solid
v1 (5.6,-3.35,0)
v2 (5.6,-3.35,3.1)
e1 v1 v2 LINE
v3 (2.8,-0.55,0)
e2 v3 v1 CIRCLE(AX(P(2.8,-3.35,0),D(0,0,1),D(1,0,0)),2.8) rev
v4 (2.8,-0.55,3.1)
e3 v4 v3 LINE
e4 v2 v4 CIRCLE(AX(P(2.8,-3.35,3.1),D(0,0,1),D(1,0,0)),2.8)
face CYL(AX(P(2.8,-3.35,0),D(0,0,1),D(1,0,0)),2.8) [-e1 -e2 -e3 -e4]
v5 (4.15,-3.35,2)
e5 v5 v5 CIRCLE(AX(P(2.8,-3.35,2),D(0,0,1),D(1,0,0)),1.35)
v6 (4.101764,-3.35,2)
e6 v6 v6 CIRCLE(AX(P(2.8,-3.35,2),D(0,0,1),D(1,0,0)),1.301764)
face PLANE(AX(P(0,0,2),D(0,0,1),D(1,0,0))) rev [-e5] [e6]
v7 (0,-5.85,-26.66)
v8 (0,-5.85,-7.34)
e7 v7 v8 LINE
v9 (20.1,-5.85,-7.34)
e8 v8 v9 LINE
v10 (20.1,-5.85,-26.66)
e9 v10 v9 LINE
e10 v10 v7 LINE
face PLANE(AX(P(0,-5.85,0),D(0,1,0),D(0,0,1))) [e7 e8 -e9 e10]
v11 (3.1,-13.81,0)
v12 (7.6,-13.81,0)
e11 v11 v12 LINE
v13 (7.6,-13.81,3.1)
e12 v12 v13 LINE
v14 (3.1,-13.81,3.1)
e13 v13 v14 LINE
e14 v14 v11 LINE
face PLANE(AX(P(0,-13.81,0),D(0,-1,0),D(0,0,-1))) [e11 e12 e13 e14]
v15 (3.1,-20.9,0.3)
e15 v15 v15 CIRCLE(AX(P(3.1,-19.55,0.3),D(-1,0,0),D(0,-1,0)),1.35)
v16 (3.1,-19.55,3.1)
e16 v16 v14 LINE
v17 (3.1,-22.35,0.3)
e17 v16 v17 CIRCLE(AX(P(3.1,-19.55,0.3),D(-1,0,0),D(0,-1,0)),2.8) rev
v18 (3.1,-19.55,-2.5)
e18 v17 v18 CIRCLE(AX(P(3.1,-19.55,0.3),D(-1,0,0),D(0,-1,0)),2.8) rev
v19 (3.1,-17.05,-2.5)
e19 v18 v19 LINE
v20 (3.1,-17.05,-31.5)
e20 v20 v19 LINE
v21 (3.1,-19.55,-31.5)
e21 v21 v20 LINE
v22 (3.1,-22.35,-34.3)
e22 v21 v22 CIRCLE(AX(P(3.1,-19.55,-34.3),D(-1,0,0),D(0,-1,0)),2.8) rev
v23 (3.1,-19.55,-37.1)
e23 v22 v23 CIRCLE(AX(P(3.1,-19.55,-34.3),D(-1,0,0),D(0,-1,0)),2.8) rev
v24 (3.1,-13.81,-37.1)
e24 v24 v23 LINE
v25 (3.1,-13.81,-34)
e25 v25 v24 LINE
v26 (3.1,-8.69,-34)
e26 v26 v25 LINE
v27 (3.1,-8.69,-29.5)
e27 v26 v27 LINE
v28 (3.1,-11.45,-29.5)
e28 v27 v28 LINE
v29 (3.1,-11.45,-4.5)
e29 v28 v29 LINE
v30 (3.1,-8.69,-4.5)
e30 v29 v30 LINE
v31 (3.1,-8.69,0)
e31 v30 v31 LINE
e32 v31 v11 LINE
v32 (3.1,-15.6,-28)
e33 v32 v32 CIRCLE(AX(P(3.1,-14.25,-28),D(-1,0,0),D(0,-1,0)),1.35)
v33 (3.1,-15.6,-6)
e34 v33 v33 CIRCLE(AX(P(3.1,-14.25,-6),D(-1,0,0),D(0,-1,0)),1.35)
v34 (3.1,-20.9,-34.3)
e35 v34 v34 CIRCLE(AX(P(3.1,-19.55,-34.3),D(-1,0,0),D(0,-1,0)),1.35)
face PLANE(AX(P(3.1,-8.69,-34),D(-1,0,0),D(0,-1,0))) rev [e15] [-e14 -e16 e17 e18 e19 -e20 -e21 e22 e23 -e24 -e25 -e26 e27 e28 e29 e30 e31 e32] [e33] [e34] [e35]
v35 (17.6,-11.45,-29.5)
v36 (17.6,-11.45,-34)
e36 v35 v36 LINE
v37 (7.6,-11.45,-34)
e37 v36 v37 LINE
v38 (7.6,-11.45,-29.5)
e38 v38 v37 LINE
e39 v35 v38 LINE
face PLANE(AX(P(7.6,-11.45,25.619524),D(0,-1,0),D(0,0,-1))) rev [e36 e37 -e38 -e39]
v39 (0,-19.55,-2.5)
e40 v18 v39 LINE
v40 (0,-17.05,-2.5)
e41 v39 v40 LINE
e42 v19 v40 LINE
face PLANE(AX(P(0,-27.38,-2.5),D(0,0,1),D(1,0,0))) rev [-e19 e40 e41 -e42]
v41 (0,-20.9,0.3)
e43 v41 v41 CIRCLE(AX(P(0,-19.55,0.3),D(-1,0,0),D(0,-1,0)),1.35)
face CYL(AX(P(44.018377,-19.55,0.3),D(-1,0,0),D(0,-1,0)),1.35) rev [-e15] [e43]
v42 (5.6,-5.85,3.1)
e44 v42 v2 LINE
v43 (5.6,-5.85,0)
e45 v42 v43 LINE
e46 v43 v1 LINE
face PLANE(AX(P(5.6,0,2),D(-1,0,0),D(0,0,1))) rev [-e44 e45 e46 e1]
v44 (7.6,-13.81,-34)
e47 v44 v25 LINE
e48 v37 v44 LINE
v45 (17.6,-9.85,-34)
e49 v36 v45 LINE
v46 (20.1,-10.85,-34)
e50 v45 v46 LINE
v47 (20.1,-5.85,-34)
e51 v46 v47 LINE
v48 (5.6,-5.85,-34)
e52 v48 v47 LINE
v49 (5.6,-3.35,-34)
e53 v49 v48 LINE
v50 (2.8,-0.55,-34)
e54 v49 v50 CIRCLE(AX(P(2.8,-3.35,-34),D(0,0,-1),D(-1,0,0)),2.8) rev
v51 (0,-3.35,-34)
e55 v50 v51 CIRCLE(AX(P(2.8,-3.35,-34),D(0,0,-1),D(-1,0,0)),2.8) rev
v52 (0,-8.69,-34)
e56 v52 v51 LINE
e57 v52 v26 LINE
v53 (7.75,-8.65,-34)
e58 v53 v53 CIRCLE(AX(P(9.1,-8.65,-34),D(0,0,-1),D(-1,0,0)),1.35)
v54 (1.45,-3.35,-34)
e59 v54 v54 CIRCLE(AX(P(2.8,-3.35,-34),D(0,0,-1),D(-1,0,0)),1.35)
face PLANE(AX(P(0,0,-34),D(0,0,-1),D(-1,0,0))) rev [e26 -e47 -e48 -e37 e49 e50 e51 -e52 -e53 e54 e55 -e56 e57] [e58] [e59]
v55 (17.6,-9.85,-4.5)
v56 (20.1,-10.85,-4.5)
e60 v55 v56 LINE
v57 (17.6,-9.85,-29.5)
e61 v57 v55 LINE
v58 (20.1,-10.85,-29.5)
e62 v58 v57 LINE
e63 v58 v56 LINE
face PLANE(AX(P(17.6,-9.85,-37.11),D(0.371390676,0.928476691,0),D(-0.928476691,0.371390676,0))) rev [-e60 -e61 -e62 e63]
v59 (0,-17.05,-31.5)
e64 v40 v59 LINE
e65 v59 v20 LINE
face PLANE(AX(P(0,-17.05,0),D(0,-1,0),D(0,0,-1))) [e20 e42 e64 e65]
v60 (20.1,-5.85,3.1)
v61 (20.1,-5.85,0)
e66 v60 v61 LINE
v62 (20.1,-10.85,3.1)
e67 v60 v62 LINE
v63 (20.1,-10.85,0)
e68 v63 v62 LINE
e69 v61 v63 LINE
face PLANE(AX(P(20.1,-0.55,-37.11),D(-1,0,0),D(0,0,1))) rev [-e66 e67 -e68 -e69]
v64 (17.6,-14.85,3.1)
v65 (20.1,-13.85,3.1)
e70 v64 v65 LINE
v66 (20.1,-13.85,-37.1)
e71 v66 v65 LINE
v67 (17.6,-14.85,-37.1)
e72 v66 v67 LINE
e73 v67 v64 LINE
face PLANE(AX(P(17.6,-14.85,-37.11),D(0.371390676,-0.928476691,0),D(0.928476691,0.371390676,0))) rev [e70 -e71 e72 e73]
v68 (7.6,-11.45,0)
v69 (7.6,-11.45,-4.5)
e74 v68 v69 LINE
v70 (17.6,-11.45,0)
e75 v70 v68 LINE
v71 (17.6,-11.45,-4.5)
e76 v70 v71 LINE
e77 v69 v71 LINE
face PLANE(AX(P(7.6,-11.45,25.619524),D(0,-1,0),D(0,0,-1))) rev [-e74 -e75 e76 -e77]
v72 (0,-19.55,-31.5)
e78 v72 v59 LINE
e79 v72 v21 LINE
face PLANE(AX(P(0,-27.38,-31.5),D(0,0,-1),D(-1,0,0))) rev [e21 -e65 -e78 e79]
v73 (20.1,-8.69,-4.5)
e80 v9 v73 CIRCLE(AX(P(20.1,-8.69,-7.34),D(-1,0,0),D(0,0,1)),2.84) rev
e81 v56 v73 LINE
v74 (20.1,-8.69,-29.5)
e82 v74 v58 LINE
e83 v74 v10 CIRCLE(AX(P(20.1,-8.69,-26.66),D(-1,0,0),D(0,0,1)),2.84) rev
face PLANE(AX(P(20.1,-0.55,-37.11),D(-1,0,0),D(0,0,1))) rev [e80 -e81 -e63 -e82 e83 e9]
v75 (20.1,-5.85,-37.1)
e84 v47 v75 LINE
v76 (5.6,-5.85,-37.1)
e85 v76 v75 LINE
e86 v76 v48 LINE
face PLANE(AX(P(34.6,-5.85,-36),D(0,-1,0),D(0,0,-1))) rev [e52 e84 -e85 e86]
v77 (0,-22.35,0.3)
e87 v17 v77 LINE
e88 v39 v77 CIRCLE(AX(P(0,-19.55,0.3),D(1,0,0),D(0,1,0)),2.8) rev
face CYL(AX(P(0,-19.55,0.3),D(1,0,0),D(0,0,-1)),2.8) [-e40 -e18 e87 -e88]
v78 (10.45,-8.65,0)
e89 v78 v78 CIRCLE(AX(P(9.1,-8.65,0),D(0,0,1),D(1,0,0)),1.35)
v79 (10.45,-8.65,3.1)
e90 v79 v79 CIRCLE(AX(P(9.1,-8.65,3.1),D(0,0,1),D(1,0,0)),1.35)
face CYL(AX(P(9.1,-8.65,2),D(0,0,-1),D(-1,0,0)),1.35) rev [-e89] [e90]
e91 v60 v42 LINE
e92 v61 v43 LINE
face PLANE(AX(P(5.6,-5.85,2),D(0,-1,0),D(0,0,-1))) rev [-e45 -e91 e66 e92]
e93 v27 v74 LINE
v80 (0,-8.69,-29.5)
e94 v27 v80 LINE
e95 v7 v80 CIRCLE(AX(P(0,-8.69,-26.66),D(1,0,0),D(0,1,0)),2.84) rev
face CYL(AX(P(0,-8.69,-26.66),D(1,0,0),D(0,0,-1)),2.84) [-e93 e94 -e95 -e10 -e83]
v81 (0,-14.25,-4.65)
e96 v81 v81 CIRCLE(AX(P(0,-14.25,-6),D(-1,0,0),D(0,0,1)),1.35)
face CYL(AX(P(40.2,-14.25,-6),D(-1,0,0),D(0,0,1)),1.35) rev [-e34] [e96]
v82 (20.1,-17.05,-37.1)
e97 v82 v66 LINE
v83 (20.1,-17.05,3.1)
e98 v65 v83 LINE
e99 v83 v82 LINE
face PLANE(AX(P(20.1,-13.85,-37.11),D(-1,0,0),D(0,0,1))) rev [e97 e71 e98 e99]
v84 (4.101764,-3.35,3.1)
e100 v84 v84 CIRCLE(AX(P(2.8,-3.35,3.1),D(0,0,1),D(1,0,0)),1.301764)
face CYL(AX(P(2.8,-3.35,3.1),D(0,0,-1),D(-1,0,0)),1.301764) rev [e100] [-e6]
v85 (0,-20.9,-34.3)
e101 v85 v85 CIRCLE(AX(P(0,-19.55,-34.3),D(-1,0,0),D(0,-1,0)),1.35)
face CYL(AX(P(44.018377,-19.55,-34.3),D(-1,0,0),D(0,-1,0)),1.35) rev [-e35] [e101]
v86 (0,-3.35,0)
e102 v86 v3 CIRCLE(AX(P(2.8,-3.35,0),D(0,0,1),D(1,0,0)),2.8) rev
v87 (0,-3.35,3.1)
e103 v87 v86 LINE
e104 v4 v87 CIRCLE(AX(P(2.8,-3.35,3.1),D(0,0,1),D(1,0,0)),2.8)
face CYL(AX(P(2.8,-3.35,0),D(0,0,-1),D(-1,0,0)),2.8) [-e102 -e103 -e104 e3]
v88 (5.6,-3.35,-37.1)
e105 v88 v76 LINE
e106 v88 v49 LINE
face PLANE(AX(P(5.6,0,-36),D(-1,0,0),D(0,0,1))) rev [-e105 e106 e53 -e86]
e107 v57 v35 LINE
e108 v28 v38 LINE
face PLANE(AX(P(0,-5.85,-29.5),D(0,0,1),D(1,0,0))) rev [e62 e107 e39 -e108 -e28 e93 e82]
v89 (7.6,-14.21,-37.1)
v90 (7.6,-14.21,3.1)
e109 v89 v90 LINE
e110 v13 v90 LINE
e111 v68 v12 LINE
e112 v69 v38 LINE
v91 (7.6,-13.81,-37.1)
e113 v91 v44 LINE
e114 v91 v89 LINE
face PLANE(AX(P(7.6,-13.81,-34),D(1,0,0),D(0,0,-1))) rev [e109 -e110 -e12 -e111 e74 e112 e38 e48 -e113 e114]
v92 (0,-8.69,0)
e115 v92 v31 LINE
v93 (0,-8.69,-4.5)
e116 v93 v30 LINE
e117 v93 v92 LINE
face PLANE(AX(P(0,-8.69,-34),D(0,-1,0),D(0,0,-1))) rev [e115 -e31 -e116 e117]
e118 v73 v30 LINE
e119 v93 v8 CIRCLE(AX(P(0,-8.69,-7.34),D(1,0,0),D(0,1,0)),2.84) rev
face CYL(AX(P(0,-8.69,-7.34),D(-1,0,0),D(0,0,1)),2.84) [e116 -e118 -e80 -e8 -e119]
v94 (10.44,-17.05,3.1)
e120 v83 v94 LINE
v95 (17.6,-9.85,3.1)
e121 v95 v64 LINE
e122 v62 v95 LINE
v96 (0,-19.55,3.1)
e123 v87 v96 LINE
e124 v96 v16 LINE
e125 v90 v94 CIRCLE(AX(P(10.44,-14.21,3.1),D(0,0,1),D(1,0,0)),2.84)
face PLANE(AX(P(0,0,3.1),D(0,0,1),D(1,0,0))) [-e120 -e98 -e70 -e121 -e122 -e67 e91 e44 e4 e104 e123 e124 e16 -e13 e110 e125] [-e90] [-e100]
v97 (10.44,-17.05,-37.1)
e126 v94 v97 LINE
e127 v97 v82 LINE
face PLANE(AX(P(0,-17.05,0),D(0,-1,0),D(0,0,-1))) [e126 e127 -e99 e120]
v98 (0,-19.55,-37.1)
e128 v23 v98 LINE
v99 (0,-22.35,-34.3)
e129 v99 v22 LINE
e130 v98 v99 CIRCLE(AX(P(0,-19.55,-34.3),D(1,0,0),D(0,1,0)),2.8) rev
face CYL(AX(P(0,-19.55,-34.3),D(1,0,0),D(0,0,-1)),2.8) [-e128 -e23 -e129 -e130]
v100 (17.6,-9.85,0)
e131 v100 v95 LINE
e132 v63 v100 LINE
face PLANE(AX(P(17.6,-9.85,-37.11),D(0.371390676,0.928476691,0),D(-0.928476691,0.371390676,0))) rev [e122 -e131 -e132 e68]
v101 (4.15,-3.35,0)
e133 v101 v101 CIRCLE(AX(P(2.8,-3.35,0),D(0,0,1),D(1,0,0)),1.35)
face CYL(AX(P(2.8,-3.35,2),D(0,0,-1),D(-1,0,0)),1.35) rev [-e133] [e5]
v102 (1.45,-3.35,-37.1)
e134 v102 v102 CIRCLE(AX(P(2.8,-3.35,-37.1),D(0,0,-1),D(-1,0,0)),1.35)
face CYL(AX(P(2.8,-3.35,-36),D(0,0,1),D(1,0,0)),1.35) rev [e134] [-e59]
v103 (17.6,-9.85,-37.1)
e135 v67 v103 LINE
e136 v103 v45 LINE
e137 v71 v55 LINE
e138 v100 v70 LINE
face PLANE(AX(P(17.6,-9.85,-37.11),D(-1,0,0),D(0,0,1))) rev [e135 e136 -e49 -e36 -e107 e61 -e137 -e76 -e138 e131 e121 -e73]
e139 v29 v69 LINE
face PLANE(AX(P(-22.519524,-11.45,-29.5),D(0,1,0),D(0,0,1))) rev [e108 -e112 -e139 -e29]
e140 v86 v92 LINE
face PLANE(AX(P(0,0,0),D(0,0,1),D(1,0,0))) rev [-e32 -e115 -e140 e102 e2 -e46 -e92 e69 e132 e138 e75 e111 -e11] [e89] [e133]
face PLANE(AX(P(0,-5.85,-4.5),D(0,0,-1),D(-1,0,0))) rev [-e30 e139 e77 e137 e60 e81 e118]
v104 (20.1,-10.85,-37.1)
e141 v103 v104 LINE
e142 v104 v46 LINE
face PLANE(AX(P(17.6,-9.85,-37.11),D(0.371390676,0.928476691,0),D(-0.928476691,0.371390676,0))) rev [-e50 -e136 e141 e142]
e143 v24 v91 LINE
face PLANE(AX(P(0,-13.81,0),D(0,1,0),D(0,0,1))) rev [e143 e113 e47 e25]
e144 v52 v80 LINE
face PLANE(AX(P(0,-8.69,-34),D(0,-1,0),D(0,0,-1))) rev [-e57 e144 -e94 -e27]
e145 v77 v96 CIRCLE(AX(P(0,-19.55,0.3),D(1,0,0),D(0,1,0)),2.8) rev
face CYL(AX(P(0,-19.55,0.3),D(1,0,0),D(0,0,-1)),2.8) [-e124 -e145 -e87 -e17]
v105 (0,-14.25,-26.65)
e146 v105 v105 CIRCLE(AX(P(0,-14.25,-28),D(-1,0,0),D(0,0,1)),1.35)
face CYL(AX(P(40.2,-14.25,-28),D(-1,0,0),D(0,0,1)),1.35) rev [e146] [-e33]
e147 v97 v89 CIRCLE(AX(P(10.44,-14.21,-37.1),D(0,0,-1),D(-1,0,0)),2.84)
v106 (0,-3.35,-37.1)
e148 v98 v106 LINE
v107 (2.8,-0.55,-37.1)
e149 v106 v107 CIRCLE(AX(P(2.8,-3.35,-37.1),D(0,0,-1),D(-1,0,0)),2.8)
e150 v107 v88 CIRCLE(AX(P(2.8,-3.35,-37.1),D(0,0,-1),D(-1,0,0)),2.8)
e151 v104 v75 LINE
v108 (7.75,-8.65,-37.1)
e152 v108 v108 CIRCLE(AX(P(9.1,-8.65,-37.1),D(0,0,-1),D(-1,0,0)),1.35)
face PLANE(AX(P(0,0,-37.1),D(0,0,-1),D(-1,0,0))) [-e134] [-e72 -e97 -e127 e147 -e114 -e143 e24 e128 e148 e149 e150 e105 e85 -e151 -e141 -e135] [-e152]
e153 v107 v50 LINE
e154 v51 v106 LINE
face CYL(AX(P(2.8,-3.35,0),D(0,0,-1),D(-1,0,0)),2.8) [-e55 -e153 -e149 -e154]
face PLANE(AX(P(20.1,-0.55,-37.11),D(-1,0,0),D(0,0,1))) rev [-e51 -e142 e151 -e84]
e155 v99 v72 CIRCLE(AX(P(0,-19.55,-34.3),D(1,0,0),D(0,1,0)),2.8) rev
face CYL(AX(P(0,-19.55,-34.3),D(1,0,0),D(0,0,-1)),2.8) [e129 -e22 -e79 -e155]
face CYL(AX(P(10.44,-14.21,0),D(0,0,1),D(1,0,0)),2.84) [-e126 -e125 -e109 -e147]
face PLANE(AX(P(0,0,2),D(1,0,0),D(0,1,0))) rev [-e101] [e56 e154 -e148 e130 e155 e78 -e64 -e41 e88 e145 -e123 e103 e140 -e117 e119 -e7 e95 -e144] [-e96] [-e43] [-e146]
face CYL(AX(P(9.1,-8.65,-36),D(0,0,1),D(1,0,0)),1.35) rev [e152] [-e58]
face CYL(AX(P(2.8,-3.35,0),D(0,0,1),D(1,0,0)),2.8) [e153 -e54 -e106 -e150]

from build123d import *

# Parameters (mm, degrees)
ESBO_O1_R                  = 1.35
RESSALTO_EXTRUS_O1_DEPTH   = 2
ESBO_O3_W                  = 40.2
ESBO_O3_H                  = 2
RESSALTO_EXTRUS_O2_DEPTH   = 10.08
ESBO_O4_W                  = 3.1
ESBO_O4_H                  = 12.84
RESSALTO_EXTRUS_O3_DEPTH   = 34
CORTE_EXTRUS_O1_DEPTH      = 55.735280213
CORTE_EXTRUS_O1_DEPTH_BACK = 55.735280213
ESBO_O5_R                  = 1.35
ESBO_O7_W                  = 37.1
ESBO_O7_H                  = 3.24
CORTE_EXTRUS_O2_DEPTH      = 2
RESSALTO_EXTRUS_O5_START   = 2
ESBO_O12_R                 = 1.35
RESSALTO_EXTRUS_O5_DEPTH   = 2
ESBO_O18_W                 = 3.1
ESBO_O18_H                 = 3.24
RESSALTO_EXTRUS_O6_DEPTH   = 2
ESBO_O19_W                 = 3.1
ESBO_O19_H                 = 3.24
RESSALTO_EXTRUS_O7_DEPTH   = 2
ESBO_O21_R                 = 1.301764144
ESBO_O21_R_2               = 1.35
RESSALTO_EXTRUS_O8_DEPTH   = 1.1
RESSALTO_EXTRUS_O9_START   = 1.1
ESBO_O22_R                 = 1.35
RESSALTO_EXTRUS_O9_DEPTH   = 1.1
ESBO_O23_W                 = 3.1
ESBO_O23_H                 = 5.6
RESSALTO_EXTRUS_O10_DEPTH  = 5.85
CORTE_EXTRUS_O3_REACH      = 63.173
ESBO_O24_R                 = 1.35
ESBO_O25_W                 = 4.5
ESBO_O25_H                 = 3.1
CORTE_EXTRUS_O6_DEPTH      = 4.48
ESBO_O27_W                 = 3.1
ESBO_O27_H                 = 29
CORTE_EXTRUS_O7_DEPTH      = 4.48
ESBO_O28_W                 = 25
ESBO_O28_H                 = 40.2
CORTE_EXTRUS_O8_DEPTH      = 1.24
ESBO_O29_W                 = 25
ESBO_O29_H                 = 5.6
RESSALTO_EXTRUS_O11_DEPTH  = 34
ESBO_O31_W                 = 3.1
ESBO_O31_H                 = 25
RESSALTO_EXTRUS_O12_DEPTH  = 2.84
ESBO_O32_W                 = 25
ESBO_O32_H                 = 5.6
RESSALTO_EXTRUS_O13_DEPTH  = 34
FILETE1_R                  = 2.84
ESBO_O33_W                 = 5.6
ESBO_O33_H                 = 3.1
CORTE_EXTRUS_O9_DEPTH      = 0.55
ESBO_O35_W                 = 3.1
ESBO_O35_H                 = 5.6
CORTE_EXTRUS_O10_DEPTH     = 5.03
FILETE2_R                  = 2.8
DIVIDIR1_SURFACE_1_BACK    = 61.888
DIVIDIR1_SURFACE_1_DEPTH   = 123.776
DIVIDIR1_SURFACE_2_BACK    = 61.888
DIVIDIR1_SURFACE_2_DEPTH   = 123.776


with BuildPart() as part:
    # Esboço1 → Ressalto-extrusão1 (new body)
    with BuildSketch(Plane.XY):
        Polygon((0, 0), (5.6, 0), (5.6, -5.85), (34.6, -5.85), (34.6, 0), (40.2, 0), (40.2, -11.45), (0, -11.45), align=None)
        with Locations((2.8, -3.35)):
            Circle(ESBO_O1_R, mode=Mode.SUBTRACT)
        with Locations((37.4, -3.35)):
            Circle(ESBO_O1_R, mode=Mode.SUBTRACT)
        with Locations((31.1, -8.65)):
            Circle(ESBO_O1_R, mode=Mode.SUBTRACT)
        with Locations((9.1, -8.65)):
            Circle(ESBO_O1_R, mode=Mode.SUBTRACT)
    extrude(amount=RESSALTO_EXTRUS_O1_DEPTH)

    # Esboço3 → Ressalto-extrusão2 (add)
    with BuildSketch(Plane.XZ.offset(11.45)):
        with Locations((20.1, 1)):
            Rectangle(ESBO_O3_W, ESBO_O3_H)
    extrude(amount=RESSALTO_EXTRUS_O2_DEPTH)

    # Esboço4 → Ressalto-extrusão3 (add)
    with BuildSketch(Plane(origin=(0, 0, 0), x_dir=(-1, 0, 0), z_dir=(0, 0, -1))):
        with Locations((-38.65, -15.11)):
            Rectangle(ESBO_O4_W, ESBO_O4_H)
        with Locations((-1.55, -15.11)):
            Rectangle(ESBO_O4_W, ESBO_O4_H)
    extrude(amount=RESSALTO_EXTRUS_O3_DEPTH)

    # Esboço5 → Corte-extrusão1 (cut, two sides: drawn at the far end of the back side and taken through both)
    with BuildSketch(Plane.ZY.offset(-37.1).offset(-CORTE_EXTRUS_O1_DEPTH_BACK)):
        with Locations((-6, -14.25)):
            Circle(ESBO_O5_R)
        with Locations((-28, -14.25)):
            Circle(ESBO_O5_R)
    extrude(amount=CORTE_EXTRUS_O1_DEPTH + CORTE_EXTRUS_O1_DEPTH_BACK, mode=Mode.SUBTRACT)

    # Esboço7 → Corte-extrusão2 (cut)
    with BuildSketch(Plane(origin=(0, 0, 0), x_dir=(-1, 0, 0), z_dir=(0, 0, -1))):
        with Locations((-18.55, -19.91)):
            Rectangle(ESBO_O7_W, ESBO_O7_H)
    extrude(amount=-CORTE_EXTRUS_O2_DEPTH, mode=Mode.SUBTRACT)

    # Esboço12 → Ressalto-extrusão5 (add)
    with BuildSketch(Plane(origin=(0, 0, -34), x_dir=(-1, 0, 0), z_dir=(0, 0, -1)).offset(RESSALTO_EXTRUS_O5_START)):
        Polygon((-5.6, 0), (0, 0), (0, -18.29), (-40.2, -18.29), (-40.2, 0), (-34.6, 0), (-34.6, -5.85), (-5.6, -5.85), align=None)
        with Locations(Location((-31.1, -8.65, 0), (0, 0, 180))):
            Circle(ESBO_O12_R, mode=Mode.SUBTRACT)
        with Locations(Location((-9.1, -8.65, 0), (0, 0, 180))):
            Circle(ESBO_O12_R, mode=Mode.SUBTRACT)
        with Locations(Location((-2.8, -3.35, 0), (0, 0, 180))):
            Circle(ESBO_O12_R, mode=Mode.SUBTRACT)
        with Locations(Location((-37.4, -3.35, 0), (0, 0, 180))):
            Circle(ESBO_O12_R, mode=Mode.SUBTRACT)
    extrude(amount=-RESSALTO_EXTRUS_O5_DEPTH)

    # Esboço18 → Ressalto-extrusão6 (add)
    with BuildSketch(Plane.XY):
        with Locations((1.55, -19.91)):
            Rectangle(ESBO_O18_W, ESBO_O18_H)
    extrude(amount=RESSALTO_EXTRUS_O6_DEPTH)

    # Esboço19 → Ressalto-extrusão7 (add)
    with BuildSketch(Plane(origin=(0, 0, -34), x_dir=(-1, 0, 0), z_dir=(0, 0, -1))):
        with Locations((-1.55, -19.91)):
            Rectangle(ESBO_O19_W, ESBO_O19_H)
        with Locations((-38.65, -19.91)):
            Rectangle(ESBO_O19_W, ESBO_O19_H)
    extrude(amount=RESSALTO_EXTRUS_O7_DEPTH)

    # Esboço21 → Ressalto-extrusão8 (add)
    with BuildSketch(Plane.XY.offset(2)):
        Polygon((37.1, -21.53), (40.2, -21.53), (40.2, 0), (34.6, 0), (34.6, -5.85), (5.6, -5.85), (5.6, 0), (0, 0), (0, -21.53), (3.1, -21.53), (3.1, -18.29), (37.1, -18.29), align=None)
        with Locations((2.8, -3.35)):
            Circle(ESBO_O21_R, mode=Mode.SUBTRACT)
        with Locations((9.1, -8.65)):
            Circle(ESBO_O21_R_2, mode=Mode.SUBTRACT)
        with Locations((31.1, -8.65)):
            Circle(ESBO_O21_R_2, mode=Mode.SUBTRACT)
        with Locations((37.4, -3.35)):
            Circle(ESBO_O21_R_2, mode=Mode.SUBTRACT)
    extrude(amount=RESSALTO_EXTRUS_O8_DEPTH)

    # Esboço22 → Ressalto-extrusão9 (add)
    with BuildSketch(Plane(origin=(0, 0, -36), x_dir=(-1, 0, 0), z_dir=(0, 0, -1)).offset(RESSALTO_EXTRUS_O9_START)):
        Polygon((-5.6, 0), (0, 0), (0, -21.53), (-3.1, -21.53), (-3.1, -18.29), (-37.1, -18.29), (-37.1, -21.53), (-40.2, -21.53), (-40.2, 0), (-34.6, 0), (-34.6, -5.85), (-5.6, -5.85), align=None)
        with Locations(Location((-37.4, -3.35, 0), (0, 0, 180))):
            Circle(ESBO_O22_R, mode=Mode.SUBTRACT)
        with Locations(Location((-31.1, -8.65, 0), (0, 0, 180))):
            Circle(ESBO_O22_R, mode=Mode.SUBTRACT)
        with Locations(Location((-9.1, -8.65, 0), (0, 0, 180))):
            Circle(ESBO_O22_R, mode=Mode.SUBTRACT)
        with Locations(Location((-2.8, -3.35, 0), (0, 0, 180))):
            Circle(ESBO_O22_R, mode=Mode.SUBTRACT)
    extrude(amount=-RESSALTO_EXTRUS_O9_DEPTH)

    # Esboço23 → Ressalto-extrusão10 (add)
    with BuildSketch(Plane.XZ.offset(21.53)):
        with Locations((1.55, 0.3)):
            Rectangle(ESBO_O23_W, ESBO_O23_H)
        with Locations((1.55, -34.3)):
            Rectangle(ESBO_O23_W, ESBO_O23_H)
        with Locations((38.65, -34.3)):
            Rectangle(ESBO_O23_W, ESBO_O23_H)
        with Locations((38.65, 0.3)):
            Rectangle(ESBO_O23_W, ESBO_O23_H)
    extrude(amount=RESSALTO_EXTRUS_O10_DEPTH)

    # Corte-extrusão3: up to this face of the body (flat: up to its plane)
    corte_extrus_o3_end = Plane(part.part.faces().sort_by_distance((40.2, -15.177512698, -17))[0])
    # Esboço24 → Corte-extrusão3 (cut, up to the picked face)
    with BuildSketch(Plane.ZY, mode=Mode.PRIVATE) as corte_extrus_o3_sk1:
        with Locations(Location((-34.3, -19.55, 0), (0, 0, 270))):
            Circle(ESBO_O24_R)
    corte_extrus_o3_tool1 = split(extrude(corte_extrus_o3_sk1.sketch, amount=-CORTE_EXTRUS_O3_REACH, mode=Mode.PRIVATE), bisect_by=corte_extrus_o3_end, keep=Keep.BOTH, mode=Mode.PRIVATE)
    # Esboço24 → Corte-extrusão3 (cut, up to the picked face)
    with BuildSketch(Plane.ZY, mode=Mode.PRIVATE) as corte_extrus_o3_sk2:
        with Locations(Location((0.3, -19.55, 0), (0, 0, 270))):
            Circle(ESBO_O24_R)
    corte_extrus_o3_tool2 = split(extrude(corte_extrus_o3_sk2.sketch, amount=-CORTE_EXTRUS_O3_REACH, mode=Mode.PRIVATE), bisect_by=corte_extrus_o3_end, keep=Keep.BOTH, mode=Mode.PRIVATE)
    add(corte_extrus_o3_tool1.solids().sort_by(Axis((0, -19.55, -34.3), (1, 0, 0)))[0], mode=Mode.SUBTRACT)
    add(corte_extrus_o3_tool2.solids().sort_by(Axis((0, -19.55, 0.3), (1, 0, 0)))[0], mode=Mode.SUBTRACT)

    # Esboço25 → Corte-extrusão6 (cut)
    with BuildSketch(Plane.XZ.offset(18.29)):
        with Locations((5.35, -35.55)):
            Rectangle(ESBO_O25_W, ESBO_O25_H)
        with Locations((34.85, -35.55)):
            Rectangle(ESBO_O25_W, ESBO_O25_H)
        with Locations((34.85, 1.55)):
            Rectangle(ESBO_O25_W, ESBO_O25_H)
        with Locations((5.35, 1.55)):
            Rectangle(ESBO_O25_W, ESBO_O25_H)
    extrude(amount=-CORTE_EXTRUS_O6_DEPTH, mode=Mode.SUBTRACT)

    # Esboço27 → Corte-extrusão7 (cut)
    with BuildSketch(Plane.XZ.offset(21.53)):
        with Locations((1.55, -17)):
            Rectangle(ESBO_O27_W, ESBO_O27_H)
        with Locations((38.65, -17)):
            Rectangle(ESBO_O27_W, ESBO_O27_H)
    extrude(amount=-CORTE_EXTRUS_O7_DEPTH, mode=Mode.SUBTRACT)

    # Esboço28 → Corte-extrusão8 (cut)
    with BuildSketch(Plane.XZ.offset(18.29)):
        with Locations((20.1, -17)):
            Rectangle(ESBO_O28_W, ESBO_O28_H)
    extrude(amount=-CORTE_EXTRUS_O8_DEPTH, mode=Mode.SUBTRACT)

    # Esboço29 → Ressalto-extrusão11 (add)
    with BuildSketch(Plane.XY.offset(-34)):
        with Locations((20.1, -14.25)):
            Rectangle(ESBO_O29_W, ESBO_O29_H)
    extrude(amount=RESSALTO_EXTRUS_O11_DEPTH)

    # Esboço31 → Ressalto-extrusão12 (add)
    with BuildSketch(Plane(origin=(0, -8.69, 0), x_dir=(1, 0, 0), z_dir=(0, 1, 0))):
        with Locations((1.55, 17)):
            Rectangle(ESBO_O31_W, ESBO_O31_H)
        with Locations((38.65, 17)):
            Rectangle(ESBO_O31_W, ESBO_O31_H)
    extrude(amount=RESSALTO_EXTRUS_O12_DEPTH)

    # Esboço32 → Ressalto-extrusão13 (add)
    with BuildSketch(Plane.ZY.offset(-37.1)):
        with Locations((-17, -8.65)):
            Rectangle(ESBO_O32_W, ESBO_O32_H)
    extrude(amount=RESSALTO_EXTRUS_O13_DEPTH)

    # Filete1
    filete1_edges = [part.edges().sort_by_distance(p)[0] for p in [
        (32.6, -17.05, -17),
        (7.6, -17.05, -17),
        (20.1, -5.85, -29.5),
        (20.1, -5.85, -4.5),
    ]]
    fillet(filete1_edges, radius=FILETE1_R)

    # Esboço33 → Corte-extrusão9 (cut)
    with BuildSketch(Plane(origin=(0, 0, 0), x_dir=(1, 0, 0), z_dir=(0, 1, 0))):
        with Locations((2.8, 35.55)):
            Rectangle(ESBO_O33_W, ESBO_O33_H)
        with Locations((37.4, 35.55)):
            Rectangle(ESBO_O33_W, ESBO_O33_H)
        with Locations((37.4, -1.55)):
            Rectangle(ESBO_O33_W, ESBO_O33_H)
        with Locations((2.8, -1.55)):
            Rectangle(ESBO_O33_W, ESBO_O33_H)
    extrude(amount=-CORTE_EXTRUS_O9_DEPTH, mode=Mode.SUBTRACT)

    # Esboço35 → Corte-extrusão10 (cut)
    with BuildSketch(Plane.XZ.offset(27.38)):
        with Locations((1.55, 0.3)):
            Rectangle(ESBO_O35_W, ESBO_O35_H)
        with Locations((38.65, 0.3)):
            Rectangle(ESBO_O35_W, ESBO_O35_H)
        with Locations((38.65, -34.3)):
            Rectangle(ESBO_O35_W, ESBO_O35_H)
        with Locations((1.55, -34.3)):
            Rectangle(ESBO_O35_W, ESBO_O35_H)
    extrude(amount=-CORTE_EXTRUS_O10_DEPTH, mode=Mode.SUBTRACT)

    # Filete2
    filete2_edges = [part.edges().sort_by_distance(p)[0] for p in [
        (34.6, -0.55, 1.55),
        (40.2, -0.55, 1.55),
        (0, -0.55, 1.55),
        (5.6, -0.55, 1.55),
        (40.2, -0.55, -35.55),
        (34.6, -0.55, -35.55),
        (5.6, -0.55, -35.55),
        (0, -0.55, -35.55),
        (1.55, -22.35, -31.5),
        (1.55, -22.35, -37.1),
        (38.65, -22.35, -31.5),
        (38.65, -22.35, -37.1),
        (38.65, -22.35, 3.1),
        (38.65, -22.35, -2.5),
        (1.55, -22.35, -2.5),
        (1.55, -22.35, 3.1),
    ]]
    fillet(filete2_edges, radius=FILETE2_R - 0.0001)  # a hair under: the kernel refuses the full size


with BuildPart() as body_2:
    # Dividir1: the piece behind the surface
    add(part.part)
    # Dividir1 surface: a surface, the sketch's curves swept straight by 123.776 mm
    with BuildLine(Plane.XY.offset(3.1).offset(-DIVIDIR1_SURFACE_1_BACK), mode=Mode.PRIVATE) as dividir1_surface_1_path:
        Line((20.1, -0.55), (20.1, -10.85))
        Line((20.1, -10.85), (17.6, -9.85))
        Line((17.6, -9.85), (17.6, -14.85))
        Line((17.6, -14.85), (20.1, -13.85))
        Line((20.1, -13.85), (20.1, -22.35))
    dividir1_surface_1 = Shell.extrude(dividir1_surface_1_path.wire(), (0 * DIVIDIR1_SURFACE_1_DEPTH, 0 * DIVIDIR1_SURFACE_1_DEPTH, 1 * DIVIDIR1_SURFACE_1_DEPTH))
    split(bisect_by=dividir1_surface_1, keep=Keep.BOTTOM)


with BuildPart() as part_1:
    add(part.part)

    # Dividir1: split by a surface, the side it looks to stays
    # Dividir1 surface: a surface, the sketch's curves swept straight by 123.776 mm
    with BuildLine(Plane.XY.offset(3.1).offset(-DIVIDIR1_SURFACE_2_BACK), mode=Mode.PRIVATE) as dividir1_surface_2_path:
        Line((20.1, -0.55), (20.1, -10.85))
        Line((20.1, -10.85), (17.6, -9.85))
        Line((17.6, -9.85), (17.6, -14.85))
        Line((17.6, -14.85), (20.1, -13.85))
        Line((20.1, -13.85), (20.1, -22.35))
    dividir1_surface_2 = Shell.extrude(dividir1_surface_2_path.wire(), (0 * DIVIDIR1_SURFACE_2_DEPTH, 0 * DIVIDIR1_SURFACE_2_DEPTH, 1 * DIVIDIR1_SURFACE_2_DEPTH))
    split(bisect_by=dividir1_surface_2, keep=Keep.TOP)


solid = body_2.part
